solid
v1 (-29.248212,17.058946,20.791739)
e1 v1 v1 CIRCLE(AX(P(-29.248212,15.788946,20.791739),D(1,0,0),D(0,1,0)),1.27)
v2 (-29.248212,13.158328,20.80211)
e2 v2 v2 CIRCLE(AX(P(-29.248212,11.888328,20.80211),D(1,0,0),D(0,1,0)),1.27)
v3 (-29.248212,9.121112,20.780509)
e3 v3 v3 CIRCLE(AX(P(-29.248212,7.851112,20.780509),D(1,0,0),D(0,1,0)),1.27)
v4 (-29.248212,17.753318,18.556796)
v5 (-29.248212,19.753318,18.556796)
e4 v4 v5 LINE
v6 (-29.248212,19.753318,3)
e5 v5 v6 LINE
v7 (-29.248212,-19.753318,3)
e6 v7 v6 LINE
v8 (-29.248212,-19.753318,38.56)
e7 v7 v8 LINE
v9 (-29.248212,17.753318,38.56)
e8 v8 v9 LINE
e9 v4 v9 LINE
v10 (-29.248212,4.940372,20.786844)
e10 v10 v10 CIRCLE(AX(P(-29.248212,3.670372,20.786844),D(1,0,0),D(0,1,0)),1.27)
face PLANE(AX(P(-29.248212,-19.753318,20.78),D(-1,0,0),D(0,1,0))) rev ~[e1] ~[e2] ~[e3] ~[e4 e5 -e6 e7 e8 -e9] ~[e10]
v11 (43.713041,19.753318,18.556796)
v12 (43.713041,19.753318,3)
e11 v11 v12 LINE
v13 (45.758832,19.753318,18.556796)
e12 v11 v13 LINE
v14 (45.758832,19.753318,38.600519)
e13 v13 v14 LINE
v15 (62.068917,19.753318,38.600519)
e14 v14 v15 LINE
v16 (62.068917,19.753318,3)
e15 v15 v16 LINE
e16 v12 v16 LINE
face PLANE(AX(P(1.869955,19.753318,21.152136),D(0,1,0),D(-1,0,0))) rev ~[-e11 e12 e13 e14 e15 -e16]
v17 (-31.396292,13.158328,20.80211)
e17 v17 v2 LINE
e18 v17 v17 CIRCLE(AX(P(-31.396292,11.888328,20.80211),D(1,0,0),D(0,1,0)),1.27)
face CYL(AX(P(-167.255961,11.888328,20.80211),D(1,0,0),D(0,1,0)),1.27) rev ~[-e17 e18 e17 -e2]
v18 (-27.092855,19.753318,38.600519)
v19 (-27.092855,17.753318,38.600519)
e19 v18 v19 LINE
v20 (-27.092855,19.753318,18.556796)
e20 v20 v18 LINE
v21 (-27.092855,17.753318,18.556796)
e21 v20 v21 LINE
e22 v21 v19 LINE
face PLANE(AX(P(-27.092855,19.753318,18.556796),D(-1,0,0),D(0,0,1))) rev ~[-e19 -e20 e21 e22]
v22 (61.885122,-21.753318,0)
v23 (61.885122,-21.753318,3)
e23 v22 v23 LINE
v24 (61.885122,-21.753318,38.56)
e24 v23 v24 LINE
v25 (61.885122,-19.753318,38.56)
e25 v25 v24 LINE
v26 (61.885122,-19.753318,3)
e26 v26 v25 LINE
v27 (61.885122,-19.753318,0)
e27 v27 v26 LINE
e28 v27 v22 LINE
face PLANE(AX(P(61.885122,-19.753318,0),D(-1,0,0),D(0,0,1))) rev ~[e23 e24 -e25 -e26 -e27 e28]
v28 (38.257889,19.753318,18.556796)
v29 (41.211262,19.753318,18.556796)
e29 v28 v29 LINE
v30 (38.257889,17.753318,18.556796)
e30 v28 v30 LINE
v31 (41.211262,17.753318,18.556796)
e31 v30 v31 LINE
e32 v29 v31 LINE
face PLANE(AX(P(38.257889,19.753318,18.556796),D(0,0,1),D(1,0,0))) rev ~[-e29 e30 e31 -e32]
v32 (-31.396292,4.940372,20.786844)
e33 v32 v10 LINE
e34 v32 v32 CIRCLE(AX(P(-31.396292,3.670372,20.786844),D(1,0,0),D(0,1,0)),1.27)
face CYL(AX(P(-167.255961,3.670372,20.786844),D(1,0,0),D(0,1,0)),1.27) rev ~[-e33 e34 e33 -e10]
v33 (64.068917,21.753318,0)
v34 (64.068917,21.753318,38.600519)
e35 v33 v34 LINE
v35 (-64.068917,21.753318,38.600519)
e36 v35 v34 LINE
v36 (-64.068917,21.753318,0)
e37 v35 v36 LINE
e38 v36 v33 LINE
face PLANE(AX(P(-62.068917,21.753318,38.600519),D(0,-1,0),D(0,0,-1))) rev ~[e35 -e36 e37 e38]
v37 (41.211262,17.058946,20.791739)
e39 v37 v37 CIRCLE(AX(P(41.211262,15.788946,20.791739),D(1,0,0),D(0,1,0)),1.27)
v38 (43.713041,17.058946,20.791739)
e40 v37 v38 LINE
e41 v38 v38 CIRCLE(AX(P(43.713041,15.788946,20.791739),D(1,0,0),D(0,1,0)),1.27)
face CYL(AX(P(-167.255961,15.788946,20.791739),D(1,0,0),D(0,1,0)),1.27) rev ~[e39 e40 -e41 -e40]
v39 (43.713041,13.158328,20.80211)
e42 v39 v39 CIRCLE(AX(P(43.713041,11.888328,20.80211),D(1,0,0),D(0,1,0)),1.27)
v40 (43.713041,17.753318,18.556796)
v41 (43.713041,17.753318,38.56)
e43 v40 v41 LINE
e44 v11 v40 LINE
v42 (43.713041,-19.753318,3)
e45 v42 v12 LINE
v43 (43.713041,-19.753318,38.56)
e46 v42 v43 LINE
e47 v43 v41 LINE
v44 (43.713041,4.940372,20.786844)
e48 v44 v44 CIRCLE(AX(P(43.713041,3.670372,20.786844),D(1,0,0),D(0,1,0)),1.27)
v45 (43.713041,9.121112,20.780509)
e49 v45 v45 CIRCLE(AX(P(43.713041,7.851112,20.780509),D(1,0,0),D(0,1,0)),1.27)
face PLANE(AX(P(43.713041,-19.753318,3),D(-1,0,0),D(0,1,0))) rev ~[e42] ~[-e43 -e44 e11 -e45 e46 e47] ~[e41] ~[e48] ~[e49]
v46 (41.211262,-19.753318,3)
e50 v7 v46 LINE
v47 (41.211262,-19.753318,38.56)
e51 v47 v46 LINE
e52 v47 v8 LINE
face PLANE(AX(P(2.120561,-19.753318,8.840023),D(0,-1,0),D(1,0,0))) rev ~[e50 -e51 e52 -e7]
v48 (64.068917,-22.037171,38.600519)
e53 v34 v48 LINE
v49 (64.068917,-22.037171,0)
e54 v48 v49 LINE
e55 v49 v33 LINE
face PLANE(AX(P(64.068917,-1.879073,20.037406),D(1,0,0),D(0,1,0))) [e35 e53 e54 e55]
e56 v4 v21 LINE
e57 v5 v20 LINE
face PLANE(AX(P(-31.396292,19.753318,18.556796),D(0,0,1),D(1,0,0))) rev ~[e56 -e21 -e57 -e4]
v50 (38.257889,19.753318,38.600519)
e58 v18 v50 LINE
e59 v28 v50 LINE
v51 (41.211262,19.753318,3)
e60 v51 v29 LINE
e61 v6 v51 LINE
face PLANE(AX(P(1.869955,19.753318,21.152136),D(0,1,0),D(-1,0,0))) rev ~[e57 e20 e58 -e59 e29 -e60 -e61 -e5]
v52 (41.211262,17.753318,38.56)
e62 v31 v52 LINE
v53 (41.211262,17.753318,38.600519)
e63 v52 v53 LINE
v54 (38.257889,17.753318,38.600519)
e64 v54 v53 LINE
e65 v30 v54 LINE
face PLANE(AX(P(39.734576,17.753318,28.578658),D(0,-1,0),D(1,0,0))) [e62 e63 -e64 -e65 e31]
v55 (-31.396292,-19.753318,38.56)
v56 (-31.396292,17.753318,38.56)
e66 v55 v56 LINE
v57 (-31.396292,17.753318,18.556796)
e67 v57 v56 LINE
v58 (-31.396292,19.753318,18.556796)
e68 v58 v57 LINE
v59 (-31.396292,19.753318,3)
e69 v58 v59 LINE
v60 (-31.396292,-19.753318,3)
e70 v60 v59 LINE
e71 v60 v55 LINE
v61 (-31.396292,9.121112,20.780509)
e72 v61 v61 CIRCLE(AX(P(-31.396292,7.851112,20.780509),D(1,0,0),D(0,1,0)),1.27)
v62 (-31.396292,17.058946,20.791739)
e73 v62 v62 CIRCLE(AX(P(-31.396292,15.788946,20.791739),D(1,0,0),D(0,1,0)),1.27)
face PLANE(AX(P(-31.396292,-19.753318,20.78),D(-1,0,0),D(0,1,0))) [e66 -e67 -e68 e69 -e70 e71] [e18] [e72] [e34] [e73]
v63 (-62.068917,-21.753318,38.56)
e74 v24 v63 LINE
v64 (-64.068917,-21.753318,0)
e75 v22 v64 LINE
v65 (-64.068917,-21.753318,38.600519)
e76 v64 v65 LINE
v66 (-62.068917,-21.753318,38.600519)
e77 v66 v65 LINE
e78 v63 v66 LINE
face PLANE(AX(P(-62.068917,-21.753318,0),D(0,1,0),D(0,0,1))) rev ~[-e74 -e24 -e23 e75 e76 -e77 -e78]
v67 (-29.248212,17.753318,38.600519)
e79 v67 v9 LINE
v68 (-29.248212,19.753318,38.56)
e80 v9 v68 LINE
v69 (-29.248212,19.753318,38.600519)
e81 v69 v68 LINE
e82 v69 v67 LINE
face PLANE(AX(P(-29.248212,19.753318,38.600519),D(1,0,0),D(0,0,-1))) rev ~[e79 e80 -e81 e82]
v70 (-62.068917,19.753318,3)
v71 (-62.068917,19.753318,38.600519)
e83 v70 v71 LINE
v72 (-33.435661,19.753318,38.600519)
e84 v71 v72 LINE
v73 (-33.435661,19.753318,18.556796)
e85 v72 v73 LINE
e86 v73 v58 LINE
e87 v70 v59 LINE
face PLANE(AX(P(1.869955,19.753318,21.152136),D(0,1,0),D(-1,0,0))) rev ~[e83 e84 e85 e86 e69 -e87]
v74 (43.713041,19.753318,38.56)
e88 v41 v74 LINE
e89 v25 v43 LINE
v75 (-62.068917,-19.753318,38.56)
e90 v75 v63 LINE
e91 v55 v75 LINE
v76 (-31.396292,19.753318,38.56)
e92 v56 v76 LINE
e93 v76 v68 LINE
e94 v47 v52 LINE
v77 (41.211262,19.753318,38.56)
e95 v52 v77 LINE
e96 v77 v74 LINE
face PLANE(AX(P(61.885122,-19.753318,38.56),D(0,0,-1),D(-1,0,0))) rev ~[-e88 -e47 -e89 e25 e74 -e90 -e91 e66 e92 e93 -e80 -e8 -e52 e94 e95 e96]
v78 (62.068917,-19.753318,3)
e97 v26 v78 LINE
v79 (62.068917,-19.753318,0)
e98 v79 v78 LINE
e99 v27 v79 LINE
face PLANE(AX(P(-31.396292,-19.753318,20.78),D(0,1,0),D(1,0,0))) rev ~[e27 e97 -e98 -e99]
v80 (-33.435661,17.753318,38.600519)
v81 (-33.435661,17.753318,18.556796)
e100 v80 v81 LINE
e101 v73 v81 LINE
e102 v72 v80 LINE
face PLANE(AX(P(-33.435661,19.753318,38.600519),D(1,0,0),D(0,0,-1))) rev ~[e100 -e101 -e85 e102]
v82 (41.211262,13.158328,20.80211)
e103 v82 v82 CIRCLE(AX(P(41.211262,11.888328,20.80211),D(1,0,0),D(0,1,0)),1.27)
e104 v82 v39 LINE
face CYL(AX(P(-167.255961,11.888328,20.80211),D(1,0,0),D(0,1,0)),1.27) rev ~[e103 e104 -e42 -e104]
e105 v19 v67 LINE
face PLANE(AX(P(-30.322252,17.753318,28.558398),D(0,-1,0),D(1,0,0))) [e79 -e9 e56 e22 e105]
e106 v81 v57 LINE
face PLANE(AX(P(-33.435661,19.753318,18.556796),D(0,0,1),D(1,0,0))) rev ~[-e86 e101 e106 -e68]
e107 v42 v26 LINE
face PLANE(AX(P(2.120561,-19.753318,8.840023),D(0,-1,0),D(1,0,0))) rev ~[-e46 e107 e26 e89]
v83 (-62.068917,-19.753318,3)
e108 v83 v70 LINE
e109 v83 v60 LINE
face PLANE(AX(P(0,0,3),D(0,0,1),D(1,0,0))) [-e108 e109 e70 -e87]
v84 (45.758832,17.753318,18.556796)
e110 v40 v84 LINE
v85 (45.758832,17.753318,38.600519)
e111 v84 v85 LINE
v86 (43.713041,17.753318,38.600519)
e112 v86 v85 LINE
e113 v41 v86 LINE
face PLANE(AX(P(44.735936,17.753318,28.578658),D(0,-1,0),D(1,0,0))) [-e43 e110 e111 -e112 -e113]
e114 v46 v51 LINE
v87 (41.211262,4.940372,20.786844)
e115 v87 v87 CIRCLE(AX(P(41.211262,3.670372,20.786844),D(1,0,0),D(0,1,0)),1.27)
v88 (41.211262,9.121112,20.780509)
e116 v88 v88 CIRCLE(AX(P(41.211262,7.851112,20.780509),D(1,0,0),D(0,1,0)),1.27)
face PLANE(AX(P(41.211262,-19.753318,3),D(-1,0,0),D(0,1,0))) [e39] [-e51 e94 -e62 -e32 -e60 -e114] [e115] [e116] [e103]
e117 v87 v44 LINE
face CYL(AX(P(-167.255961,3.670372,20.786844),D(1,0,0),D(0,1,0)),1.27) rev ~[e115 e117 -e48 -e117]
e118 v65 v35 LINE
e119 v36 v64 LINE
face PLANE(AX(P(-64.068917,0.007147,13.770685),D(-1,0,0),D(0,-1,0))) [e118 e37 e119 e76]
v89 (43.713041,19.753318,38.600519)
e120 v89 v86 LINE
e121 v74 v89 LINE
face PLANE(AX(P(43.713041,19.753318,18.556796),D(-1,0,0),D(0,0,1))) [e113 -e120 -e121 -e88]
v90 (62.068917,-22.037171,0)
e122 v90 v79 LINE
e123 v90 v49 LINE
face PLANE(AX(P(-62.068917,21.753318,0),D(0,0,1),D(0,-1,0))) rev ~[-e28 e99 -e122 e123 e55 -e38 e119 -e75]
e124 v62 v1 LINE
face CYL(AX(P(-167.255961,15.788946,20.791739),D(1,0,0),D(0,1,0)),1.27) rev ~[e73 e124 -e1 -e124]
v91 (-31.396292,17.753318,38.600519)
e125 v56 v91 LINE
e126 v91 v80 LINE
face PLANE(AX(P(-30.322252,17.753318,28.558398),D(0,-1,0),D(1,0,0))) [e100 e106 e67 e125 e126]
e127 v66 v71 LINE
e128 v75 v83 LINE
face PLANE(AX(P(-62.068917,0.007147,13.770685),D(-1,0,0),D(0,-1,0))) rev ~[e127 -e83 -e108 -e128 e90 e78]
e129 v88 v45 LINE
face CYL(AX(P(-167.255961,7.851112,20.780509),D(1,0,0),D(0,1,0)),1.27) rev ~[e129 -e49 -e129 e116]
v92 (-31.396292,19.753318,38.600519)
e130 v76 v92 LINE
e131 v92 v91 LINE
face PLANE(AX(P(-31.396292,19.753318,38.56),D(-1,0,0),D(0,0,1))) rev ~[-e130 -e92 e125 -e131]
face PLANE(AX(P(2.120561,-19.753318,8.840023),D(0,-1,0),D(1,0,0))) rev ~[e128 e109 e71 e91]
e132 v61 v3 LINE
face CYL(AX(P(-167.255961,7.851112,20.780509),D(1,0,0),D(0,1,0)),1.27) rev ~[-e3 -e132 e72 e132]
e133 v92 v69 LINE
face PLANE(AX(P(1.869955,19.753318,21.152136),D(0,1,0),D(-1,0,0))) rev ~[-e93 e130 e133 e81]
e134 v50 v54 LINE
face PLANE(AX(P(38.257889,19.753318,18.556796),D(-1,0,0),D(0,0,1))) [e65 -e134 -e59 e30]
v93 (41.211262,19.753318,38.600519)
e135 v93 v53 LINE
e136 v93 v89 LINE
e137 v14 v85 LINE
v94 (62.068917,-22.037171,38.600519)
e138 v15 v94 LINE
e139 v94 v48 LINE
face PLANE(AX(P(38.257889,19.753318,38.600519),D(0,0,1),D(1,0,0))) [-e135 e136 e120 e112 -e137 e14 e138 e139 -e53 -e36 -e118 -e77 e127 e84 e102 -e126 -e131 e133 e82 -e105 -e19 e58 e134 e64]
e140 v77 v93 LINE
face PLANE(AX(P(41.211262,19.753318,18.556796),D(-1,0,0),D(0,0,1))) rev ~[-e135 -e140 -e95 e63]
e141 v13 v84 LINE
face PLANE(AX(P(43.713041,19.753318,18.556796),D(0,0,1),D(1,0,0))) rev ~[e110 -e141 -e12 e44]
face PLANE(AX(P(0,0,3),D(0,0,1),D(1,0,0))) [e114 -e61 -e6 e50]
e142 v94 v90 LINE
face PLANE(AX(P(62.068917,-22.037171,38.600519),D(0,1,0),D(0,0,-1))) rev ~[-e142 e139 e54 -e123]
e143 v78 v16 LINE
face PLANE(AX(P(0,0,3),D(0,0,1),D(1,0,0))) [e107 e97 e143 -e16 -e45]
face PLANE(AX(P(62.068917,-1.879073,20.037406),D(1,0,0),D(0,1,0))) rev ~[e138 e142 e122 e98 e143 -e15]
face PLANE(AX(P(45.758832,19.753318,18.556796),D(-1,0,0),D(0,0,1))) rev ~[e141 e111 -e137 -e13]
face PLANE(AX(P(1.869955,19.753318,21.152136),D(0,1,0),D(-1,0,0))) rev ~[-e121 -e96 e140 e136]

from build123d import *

# Parameters (mm, degrees)
F0_W      = 124.1378337145
F0_H      = 39.50663656
F1_DEPTH  = 3
F2_W      = 2.5017783046
F2_H      = 39.50663656
F2_W_2    = 2.1480806172
F3_DEPTH  = 17.78
F5_DEPTH  = 17.78
F7_D      = 2.54
F8_W      = 30.6726247072
F8_H      = 35.56
F8_W_2    = 18.1720815599
F8_W_3    = 70.4594738781
F9_DEPTH  = 2
F11_DEPTH = 2
F13_DEPTH = 2
F15_DEPTH = 2
F16_W     = 2.9533728957
F16_H     = 20.0437232852
F16_W_2   = 2.1480806172
F16_H_2   = 20.0032039857
F16_W_3   = 2.0457915962
F17_DEPTH = 2


with BuildPart() as f1:
    # F0 (on Top) → F1 (new body)
    with BuildSketch(Plane.XY):
        Rectangle(F0_W, F0_H)
    extrude(amount=F1_DEPTH)

    # F2 (on face) → F3 (join)
    with BuildSketch(Plane.XY.offset(3)):
        with Locations((42.4621514976, 0)):
            Rectangle(F2_W, F2_H)
        with Locations((-30.3222518414, 0)):
            Rectangle(F2_W_2, F2_H)
    extrude(amount=F3_DEPTH)

    # F5 (add): faces of the model
    f5_faces = [f1.faces().sort_by_distance(p)[0] for p in [
        (-30.3222518414, 0, 20.78),
        (42.4621514976, 0, 20.78),
    ]]
    extrude(f5_faces, amount=F5_DEPTH)

    # F7 (through all)
    with Locations(Plane(origin=(-31.39629215, 0, 0), x_dir=(0, -1, 0), z_dir=(-1, 0, 0))):
        with Locations((-11.8883280084, 20.8021104336), (-15.7889463007, 20.7917392254), (-7.8511117026, 20.7805093378), (-3.6703720689, 20.7868441939)):
            Hole(F7_D / 2)

    # F8 (on face) → F9 (join)
    with BuildSketch(Plane.XZ.offset(19.75331828)):
        Polygon((-62.0689168572, 3), (-62.0689168572, 0), (61.8851222098, 0), (61.8851222098, 3), (43.7130406499, 3), (43.7130406499, 38.56), (41.2112623453, 38.56), (41.2112623453, 3), (-29.2482115328, 3), (-29.2482115328, 38.56), (-31.39629215, 38.56), (-31.39629215, 3), align=None)
        with Locations((-46.7326045036, 20.78)):
            Rectangle(F8_W, F8_H)
        with Locations((52.7990814298, 20.78)):
            Rectangle(F8_W_2, F8_H)
        with Locations((5.9815254062, 20.78)):
            Rectangle(F8_W_3, F8_H)
    extrude(amount=F9_DEPTH)

    # F10 (on face) → F11 (join)
    with BuildSketch(Plane(origin=(0, 19.75331828, 0), x_dir=(-1, 0, 0), z_dir=(0, 1, 0))):
        Polygon((-62.0689168572, 38.6005192995), (-62.0689168572, 3), (-43.7130406499, 3), (-43.7130406499, 38.56), (-41.2112623453, 38.56), (-41.2112623453, 3), (29.2482115328, 3), (29.2482115328, 38.56), (31.39629215, 38.56), (31.39629215, 3), (62.0689168572, 3), (62.0689168572, 38.6005192995), align=None)
        Polygon((-62.0689168572, 3), (-62.0689168572, 0), (62.0689168572, 0), (62.0689168572, 3), (31.39629215, 3), (31.39629215, 38.56), (29.2482115328, 38.56), (29.2482115328, 3), (-41.2112623453, 3), (-41.2112623453, 38.56), (-43.7130406499, 38.56), (-43.7130406499, 3), align=None)
    extrude(amount=F11_DEPTH)

    # F12 (on face) → F13 (join)
    with BuildSketch(Plane.YZ.offset(62.0689168572)):
        Polygon((19.75331828, 3), (19.75331828, 38.6005192995), (-22.0371708274, 38.6005192995), (-22.0371708274, 0), (-19.75331828, 0), (-19.75331828, 3), align=None)
        Polygon((21.75331828, 0), (21.75331828, 38.6005192995), (19.75331828, 38.6005192995), (19.75331828, 3), (-19.75331828, 3), (-19.75331828, 0), align=None)
    extrude(amount=F13_DEPTH)

    # F14 (on face) → F15 (join)
    with BuildSketch(Plane(origin=(-62.0689168572, 0, 0), x_dir=(0, -1, 0), z_dir=(-1, 0, 0))):
        Polygon((-21.75331828, 0), (21.75331828, 0), (21.75331828, 38.56), (19.75331828, 38.56), (19.75331828, 3), (-19.75331828, 3), (-19.75331828, 38.6005192995), (-21.75331828, 38.6005192995), align=None)
        Polygon((19.75331828, 38.56), (21.75331828, 38.56), (21.75331828, 38.6005192995), (-19.75331828, 38.6005192995), (-19.75331828, 3), (19.75331828, 3), align=None)
    extrude(amount=F15_DEPTH)

    # F16 (on face) → F17 (join)
    with BuildSketch(Plane.XZ.offset(-19.75331828)):
        with Locations((39.7345758975, 28.5786576569)):
            Rectangle(F16_W, F16_H)
        with Locations((-30.3222518414, 28.5583980072)):
            Rectangle(F16_W_2, F16_H_2)
        Polygon((-33.4356613457, 18.5567960143), (-31.39629215, 18.5567960143), (-31.39629215, 38.56), (-31.39629215, 38.6005192995), (-33.4356613457, 38.6005192995), align=None)
        Polygon((-29.2482115328, 38.56), (-29.2482115328, 18.5567960143), (-27.0928554237, 18.5567960143), (-27.0928554237, 38.6005192995), (-29.2482115328, 38.6005192995), align=None)
        with Locations((44.735936448, 28.5786576569)):
            Rectangle(F16_W_3, F16_H)
    extrude(amount=F17_DEPTH)


solid = f1.part
